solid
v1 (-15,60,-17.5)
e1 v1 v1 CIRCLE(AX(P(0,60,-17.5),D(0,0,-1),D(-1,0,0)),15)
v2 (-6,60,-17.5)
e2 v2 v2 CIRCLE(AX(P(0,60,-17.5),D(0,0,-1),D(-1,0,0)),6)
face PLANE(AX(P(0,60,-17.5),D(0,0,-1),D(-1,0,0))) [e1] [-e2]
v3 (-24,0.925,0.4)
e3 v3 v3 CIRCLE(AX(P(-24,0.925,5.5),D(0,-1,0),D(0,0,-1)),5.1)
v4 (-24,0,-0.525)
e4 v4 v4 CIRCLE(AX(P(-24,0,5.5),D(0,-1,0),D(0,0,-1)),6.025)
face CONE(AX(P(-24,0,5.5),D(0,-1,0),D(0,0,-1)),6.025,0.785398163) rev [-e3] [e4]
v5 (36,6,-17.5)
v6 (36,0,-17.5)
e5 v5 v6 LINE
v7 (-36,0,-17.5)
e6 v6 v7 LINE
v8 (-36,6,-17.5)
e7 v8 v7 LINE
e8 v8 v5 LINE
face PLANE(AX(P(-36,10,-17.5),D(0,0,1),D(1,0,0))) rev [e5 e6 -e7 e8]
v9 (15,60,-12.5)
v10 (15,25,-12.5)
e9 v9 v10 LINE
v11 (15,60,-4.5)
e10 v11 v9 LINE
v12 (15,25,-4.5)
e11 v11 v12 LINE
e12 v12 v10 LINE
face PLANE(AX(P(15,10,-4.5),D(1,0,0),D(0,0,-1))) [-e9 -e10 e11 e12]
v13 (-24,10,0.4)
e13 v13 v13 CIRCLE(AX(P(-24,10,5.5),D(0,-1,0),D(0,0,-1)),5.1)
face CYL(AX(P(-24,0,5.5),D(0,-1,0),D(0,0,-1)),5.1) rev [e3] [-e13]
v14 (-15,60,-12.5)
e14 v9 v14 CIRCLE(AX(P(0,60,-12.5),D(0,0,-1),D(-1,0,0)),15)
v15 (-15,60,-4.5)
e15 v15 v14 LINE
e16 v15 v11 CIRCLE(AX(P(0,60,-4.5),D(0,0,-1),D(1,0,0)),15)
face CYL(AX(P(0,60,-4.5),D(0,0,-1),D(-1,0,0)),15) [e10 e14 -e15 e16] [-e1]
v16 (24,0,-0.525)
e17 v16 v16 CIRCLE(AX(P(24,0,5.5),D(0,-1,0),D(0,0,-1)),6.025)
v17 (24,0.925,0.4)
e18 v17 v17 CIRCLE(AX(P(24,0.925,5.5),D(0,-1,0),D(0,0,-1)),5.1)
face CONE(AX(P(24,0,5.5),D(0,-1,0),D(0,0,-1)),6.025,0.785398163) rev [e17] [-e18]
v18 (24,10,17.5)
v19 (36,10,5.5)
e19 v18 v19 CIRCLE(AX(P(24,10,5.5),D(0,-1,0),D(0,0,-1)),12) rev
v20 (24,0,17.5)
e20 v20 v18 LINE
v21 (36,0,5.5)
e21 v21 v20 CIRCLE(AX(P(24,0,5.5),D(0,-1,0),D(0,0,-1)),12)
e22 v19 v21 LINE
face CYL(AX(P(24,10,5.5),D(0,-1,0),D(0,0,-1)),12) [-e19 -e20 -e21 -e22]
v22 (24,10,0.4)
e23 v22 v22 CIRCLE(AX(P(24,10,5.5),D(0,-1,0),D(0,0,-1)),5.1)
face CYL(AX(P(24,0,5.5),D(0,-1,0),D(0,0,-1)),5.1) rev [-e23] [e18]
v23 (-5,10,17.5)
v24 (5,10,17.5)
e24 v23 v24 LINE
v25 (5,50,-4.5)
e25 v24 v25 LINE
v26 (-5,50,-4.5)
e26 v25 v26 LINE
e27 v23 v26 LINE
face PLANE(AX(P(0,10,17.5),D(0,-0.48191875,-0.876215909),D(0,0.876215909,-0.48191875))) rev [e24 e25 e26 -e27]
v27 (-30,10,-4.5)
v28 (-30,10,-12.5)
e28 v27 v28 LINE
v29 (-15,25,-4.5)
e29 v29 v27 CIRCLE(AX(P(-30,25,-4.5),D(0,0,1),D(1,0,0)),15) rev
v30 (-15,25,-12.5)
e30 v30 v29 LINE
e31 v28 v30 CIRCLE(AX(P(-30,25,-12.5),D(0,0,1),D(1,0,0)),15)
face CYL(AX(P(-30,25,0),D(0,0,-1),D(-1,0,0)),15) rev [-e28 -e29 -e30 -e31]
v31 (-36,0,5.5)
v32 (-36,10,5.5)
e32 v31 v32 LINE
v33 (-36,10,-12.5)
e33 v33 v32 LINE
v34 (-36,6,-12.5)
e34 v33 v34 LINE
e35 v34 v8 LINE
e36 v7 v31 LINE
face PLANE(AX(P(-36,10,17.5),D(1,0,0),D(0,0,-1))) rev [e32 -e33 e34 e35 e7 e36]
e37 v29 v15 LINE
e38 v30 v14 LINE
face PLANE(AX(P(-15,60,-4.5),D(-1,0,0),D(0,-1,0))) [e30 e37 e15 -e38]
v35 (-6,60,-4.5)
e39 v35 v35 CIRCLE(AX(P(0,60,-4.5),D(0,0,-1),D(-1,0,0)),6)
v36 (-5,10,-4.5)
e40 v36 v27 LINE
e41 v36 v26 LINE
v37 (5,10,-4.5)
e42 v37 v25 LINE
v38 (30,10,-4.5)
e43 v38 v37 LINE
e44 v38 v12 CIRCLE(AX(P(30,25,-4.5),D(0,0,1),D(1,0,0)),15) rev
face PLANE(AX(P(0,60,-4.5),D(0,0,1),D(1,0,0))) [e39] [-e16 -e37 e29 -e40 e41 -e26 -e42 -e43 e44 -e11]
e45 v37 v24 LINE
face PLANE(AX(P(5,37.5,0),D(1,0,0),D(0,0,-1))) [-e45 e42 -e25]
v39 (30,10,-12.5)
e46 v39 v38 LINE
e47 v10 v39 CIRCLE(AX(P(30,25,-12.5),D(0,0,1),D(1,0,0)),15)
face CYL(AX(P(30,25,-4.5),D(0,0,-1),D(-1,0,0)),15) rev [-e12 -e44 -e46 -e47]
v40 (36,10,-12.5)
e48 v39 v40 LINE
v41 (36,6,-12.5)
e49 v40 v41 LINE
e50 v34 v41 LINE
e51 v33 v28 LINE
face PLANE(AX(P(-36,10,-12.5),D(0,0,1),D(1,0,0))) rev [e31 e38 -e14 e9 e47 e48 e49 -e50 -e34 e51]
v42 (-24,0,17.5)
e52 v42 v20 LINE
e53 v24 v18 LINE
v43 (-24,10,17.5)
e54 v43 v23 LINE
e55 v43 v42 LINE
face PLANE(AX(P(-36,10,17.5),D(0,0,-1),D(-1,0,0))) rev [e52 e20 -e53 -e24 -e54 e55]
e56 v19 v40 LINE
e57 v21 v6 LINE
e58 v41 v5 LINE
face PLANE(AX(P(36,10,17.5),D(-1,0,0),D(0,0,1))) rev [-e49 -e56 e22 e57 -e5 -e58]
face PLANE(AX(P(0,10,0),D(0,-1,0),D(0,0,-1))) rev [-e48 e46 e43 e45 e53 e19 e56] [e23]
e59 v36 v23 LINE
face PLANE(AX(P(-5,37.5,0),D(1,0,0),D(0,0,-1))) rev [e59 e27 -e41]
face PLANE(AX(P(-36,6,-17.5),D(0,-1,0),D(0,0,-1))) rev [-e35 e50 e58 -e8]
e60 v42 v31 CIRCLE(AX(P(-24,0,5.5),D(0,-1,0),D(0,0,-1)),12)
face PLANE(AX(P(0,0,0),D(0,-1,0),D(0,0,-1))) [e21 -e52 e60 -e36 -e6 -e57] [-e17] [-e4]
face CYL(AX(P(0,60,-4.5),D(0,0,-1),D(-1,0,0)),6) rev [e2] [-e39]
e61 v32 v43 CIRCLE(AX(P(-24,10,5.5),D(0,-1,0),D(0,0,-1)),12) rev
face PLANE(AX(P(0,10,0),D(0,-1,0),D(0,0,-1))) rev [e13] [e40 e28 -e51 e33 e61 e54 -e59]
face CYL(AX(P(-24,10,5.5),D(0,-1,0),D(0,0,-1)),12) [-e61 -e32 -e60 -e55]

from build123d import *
from build123d.topology import SkipClean

# Parameters (mm, degrees)
SKETCH1_W                    = 72
SKETCH1_H                    = 35
BOSS_EXTRUDE1_DEPTH          = 10
FILLET1_R                    = 12
CUT_EXTRUDE1_DEPTH           = 42.258332492
CUT_EXTRUDE1_DEPTH_BACK      = 42.258332492
SKETCH2_W                    = 5
SKETCH2_H                    = 4
M12_TAPPED_HOLE1_D           = 10.2
M12_TAPPED_HOLE1_CSINK_D     = 12.05
M12_TAPPED_HOLE1_CSINK_ANGLE = 90
SKETCH6_R                    = 6
BOSS_EXTRUDE2_DEPTH          = 8
FILLET2_R                    = 15
BOSS_EXTRUDE3_START          = 5
SKETCH7_R                    = 15
SKETCH7_R_2                  = 6
BOSS_EXTRUDE3_DEPTH          = 5
RIB5_START                   = -5
RIB5_DEPTH                   = 10


# Read off the part's stored shape, not the designer's step: Rib5
with BuildPart() as part:
    # Sketch1 → Boss-Extrude1 (new body)
    with BuildSketch(Plane(origin=(0, 0, 0), x_dir=(1, 0, 0), z_dir=(0, 1, 0))):
        Rectangle(SKETCH1_W, SKETCH1_H)
    extrude(amount=BOSS_EXTRUDE1_DEPTH)

    # Fillet1
    fillet1_edges = [part.edges().sort_by_distance(p)[0] for p in [
        (36, 5, 17.5),
        (-36, 5, 17.5),
    ]]
    fillet(fillet1_edges, radius=FILLET1_R)

    # Sketch2 → Cut-Extrude1 (cut, two sides: drawn at the far end of the back side and taken through both)
    with BuildSketch(Plane(origin=(0, 0, 0), x_dir=(0, 0, -1), z_dir=(1, 0, 0)).offset(-CUT_EXTRUDE1_DEPTH_BACK)):
        with Locations((15, 8)):
            Rectangle(SKETCH2_W, SKETCH2_H)
    extrude(amount=CUT_EXTRUDE1_DEPTH + CUT_EXTRUDE1_DEPTH_BACK, mode=Mode.SUBTRACT)

    # M12 Tapped Hole1 (through all)
    with Locations(Plane.XZ):
        with Locations((-24, 5.5), (24, 5.5)):
            CounterSinkHole(M12_TAPPED_HOLE1_D / 2, M12_TAPPED_HOLE1_CSINK_D / 2, counter_sink_angle=M12_TAPPED_HOLE1_CSINK_ANGLE)

    # Sketch6 → Boss-Extrude2 (add)
    with BuildSketch(Plane(origin=(0, 0, -12.5), x_dir=(-1, 0, 0), z_dir=(0, 0, -1))):
        with BuildLine():
            Line((15, 10), (-15, 10))
            Line((-15, 10), (-15, 60))
            ThreePointArc((-15, 60), (0, 75), (15, 60))
            Line((15, 60), (15, 10))
        make_face()
        with Locations((0, 60)):
            Circle(SKETCH6_R, mode=Mode.SUBTRACT)
    extrude(amount=-BOSS_EXTRUDE2_DEPTH)

    # Fillet2
    fillet2_edges = [part.edges().sort_by_distance(p)[0] for p in [
        (-15, 10, -8.5),
        (15, 10, -8.5),
    ]]
    fillet(fillet2_edges, radius=FILLET2_R)

    # Sketch7 → Boss-Extrude3 (add)
    with SkipClean():  # the faces are left unmerged after this step: merging them gives an invalid solid
        with BuildSketch(Plane(origin=(0, 0, -12.5), x_dir=(-1, 0, 0), z_dir=(0, 0, -1)).offset(BOSS_EXTRUDE3_START)):
            with Locations((0, 60)):
                Circle(SKETCH7_R)
            with Locations((0, 60)):
                Circle(SKETCH7_R_2, mode=Mode.SUBTRACT)
        extrude(amount=-BOSS_EXTRUDE3_DEPTH)

    # Rib5 outline → Rib5 (add)
    with SkipClean():  # the faces are left unmerged after this step: merging them gives an invalid solid
        with BuildSketch(Plane(origin=(0, 0, 0), x_dir=(0, 0, -1), z_dir=(1, 0, 0)).offset(RIB5_START)):
            Polygon((4.5, 50), (-17.5, 10), (4.5, 10), align=None)
        extrude(amount=RIB5_DEPTH)


solid = part.part
